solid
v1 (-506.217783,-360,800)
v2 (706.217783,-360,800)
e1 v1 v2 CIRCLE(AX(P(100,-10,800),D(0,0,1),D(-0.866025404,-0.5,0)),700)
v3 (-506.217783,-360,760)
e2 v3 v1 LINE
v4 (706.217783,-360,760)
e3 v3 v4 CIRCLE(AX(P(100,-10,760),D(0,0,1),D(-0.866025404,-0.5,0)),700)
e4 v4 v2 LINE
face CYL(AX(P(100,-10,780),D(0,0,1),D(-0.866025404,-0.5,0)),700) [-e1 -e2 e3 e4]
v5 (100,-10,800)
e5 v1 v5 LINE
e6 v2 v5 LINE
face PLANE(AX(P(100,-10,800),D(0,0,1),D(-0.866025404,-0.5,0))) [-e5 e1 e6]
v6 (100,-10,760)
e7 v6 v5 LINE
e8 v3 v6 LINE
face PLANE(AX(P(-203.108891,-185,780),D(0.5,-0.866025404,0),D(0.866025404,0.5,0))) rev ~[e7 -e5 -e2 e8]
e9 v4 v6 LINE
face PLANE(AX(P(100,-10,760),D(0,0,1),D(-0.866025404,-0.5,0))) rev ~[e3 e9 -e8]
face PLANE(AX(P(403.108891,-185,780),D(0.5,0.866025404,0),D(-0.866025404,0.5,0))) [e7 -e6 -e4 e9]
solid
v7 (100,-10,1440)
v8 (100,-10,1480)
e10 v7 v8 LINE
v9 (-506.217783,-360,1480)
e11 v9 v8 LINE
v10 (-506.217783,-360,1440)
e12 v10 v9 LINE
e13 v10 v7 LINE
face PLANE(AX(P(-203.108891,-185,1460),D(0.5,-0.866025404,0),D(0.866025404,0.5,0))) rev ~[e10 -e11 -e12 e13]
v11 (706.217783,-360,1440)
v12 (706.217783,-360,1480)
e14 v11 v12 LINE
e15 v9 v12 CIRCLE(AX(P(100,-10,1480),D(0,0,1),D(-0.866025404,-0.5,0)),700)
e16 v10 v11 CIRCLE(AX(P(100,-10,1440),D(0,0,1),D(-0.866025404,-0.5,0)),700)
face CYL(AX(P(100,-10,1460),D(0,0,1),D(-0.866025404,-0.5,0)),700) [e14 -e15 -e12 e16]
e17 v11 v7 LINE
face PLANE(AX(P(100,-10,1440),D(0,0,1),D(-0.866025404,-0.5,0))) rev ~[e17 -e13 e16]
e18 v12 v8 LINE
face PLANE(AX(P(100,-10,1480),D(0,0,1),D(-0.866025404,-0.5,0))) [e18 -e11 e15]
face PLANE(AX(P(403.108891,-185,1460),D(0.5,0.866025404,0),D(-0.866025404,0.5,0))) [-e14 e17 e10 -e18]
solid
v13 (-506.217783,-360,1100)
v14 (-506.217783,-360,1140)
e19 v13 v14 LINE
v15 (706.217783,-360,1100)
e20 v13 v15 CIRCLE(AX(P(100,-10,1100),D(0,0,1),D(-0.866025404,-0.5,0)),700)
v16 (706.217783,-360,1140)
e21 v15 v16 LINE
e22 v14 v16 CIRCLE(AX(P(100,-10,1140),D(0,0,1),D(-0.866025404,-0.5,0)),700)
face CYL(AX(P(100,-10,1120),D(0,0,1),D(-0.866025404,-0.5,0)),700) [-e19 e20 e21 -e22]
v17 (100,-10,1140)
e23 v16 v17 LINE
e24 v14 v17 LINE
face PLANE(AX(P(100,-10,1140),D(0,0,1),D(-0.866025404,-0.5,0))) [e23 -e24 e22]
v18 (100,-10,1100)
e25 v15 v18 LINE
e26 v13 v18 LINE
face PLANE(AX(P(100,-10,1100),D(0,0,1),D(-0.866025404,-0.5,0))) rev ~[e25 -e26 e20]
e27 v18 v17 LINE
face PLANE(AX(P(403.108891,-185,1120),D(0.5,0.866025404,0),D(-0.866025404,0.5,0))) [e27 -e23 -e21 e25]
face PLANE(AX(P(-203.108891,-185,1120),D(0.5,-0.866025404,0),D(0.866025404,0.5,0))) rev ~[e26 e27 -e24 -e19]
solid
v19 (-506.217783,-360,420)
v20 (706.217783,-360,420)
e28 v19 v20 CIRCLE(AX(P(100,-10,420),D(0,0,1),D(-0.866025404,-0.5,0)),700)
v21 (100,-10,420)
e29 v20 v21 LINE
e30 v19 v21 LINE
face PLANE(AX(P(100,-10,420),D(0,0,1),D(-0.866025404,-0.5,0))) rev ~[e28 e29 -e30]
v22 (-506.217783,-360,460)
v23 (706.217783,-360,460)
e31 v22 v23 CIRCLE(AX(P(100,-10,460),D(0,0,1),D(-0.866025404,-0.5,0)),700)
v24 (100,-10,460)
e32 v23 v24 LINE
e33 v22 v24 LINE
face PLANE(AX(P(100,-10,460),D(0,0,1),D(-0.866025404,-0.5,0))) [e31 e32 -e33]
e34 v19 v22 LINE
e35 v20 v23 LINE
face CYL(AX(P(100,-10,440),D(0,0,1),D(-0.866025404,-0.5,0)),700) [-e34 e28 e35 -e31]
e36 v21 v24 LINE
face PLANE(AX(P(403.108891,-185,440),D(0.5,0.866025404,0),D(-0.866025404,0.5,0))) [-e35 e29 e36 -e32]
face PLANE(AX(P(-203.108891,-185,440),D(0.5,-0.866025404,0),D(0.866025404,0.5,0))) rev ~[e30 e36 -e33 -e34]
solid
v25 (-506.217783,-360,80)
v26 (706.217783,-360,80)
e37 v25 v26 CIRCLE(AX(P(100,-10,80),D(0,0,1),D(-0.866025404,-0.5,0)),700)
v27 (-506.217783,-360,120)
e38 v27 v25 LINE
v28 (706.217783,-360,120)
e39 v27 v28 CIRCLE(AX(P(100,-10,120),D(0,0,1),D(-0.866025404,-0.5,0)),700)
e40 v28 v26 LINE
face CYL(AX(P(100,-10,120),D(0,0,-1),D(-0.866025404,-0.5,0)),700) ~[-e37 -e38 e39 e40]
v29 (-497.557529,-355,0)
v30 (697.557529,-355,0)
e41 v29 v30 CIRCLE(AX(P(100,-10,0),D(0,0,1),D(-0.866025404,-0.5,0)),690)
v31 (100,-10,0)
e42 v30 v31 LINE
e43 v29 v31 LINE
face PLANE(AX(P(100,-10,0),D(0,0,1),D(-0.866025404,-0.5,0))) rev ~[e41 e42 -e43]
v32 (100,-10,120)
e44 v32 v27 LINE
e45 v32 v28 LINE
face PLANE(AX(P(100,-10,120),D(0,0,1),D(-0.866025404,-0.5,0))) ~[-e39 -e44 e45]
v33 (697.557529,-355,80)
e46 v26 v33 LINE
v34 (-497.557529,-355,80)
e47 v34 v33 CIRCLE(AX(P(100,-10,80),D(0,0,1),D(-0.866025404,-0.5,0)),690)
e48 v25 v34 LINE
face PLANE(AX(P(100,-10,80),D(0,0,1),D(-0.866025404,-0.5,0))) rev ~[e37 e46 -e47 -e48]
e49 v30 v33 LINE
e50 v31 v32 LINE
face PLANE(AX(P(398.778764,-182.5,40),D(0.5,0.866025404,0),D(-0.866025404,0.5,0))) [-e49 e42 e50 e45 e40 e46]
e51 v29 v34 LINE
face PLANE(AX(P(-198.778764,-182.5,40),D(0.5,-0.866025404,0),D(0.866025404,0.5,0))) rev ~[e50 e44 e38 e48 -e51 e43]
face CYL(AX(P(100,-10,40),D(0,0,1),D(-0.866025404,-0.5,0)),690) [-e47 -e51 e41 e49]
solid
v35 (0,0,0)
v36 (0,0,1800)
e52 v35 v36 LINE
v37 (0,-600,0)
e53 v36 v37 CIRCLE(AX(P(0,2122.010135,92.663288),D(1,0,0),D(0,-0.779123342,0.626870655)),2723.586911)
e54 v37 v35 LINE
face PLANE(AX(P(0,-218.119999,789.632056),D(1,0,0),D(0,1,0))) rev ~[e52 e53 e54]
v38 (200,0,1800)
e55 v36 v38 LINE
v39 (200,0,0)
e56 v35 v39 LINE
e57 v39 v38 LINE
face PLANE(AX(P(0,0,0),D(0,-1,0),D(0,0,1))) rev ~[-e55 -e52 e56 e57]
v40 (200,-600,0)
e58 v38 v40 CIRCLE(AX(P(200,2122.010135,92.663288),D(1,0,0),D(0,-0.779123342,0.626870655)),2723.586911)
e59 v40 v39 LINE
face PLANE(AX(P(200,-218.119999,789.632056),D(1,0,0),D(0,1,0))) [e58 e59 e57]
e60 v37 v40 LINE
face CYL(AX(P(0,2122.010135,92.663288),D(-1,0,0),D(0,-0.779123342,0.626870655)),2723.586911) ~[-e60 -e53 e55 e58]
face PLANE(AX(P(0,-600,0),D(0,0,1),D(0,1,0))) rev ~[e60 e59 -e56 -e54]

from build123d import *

# Parameters (mm, degrees)
F4_DEPTH      = 200
F6_W          = 690
F6_H          = 80
F7_ANGLE_BACK = 60
F7_ANGLE      = 120
F6_W_2        = 700
F6_H_2        = 40


# Not quite as in the source:
# - a feature of the source that left no trace in its solid (it failed there, or was rolled back) is left out


with BuildPart() as f4:
    # F3 (on Right) → F4 (new body)
    with BuildSketch(Plane.YZ):
        with BuildLine():
            Line((-600, 0), (0, 0))
            Line((0, 0), (0, 1800))
            ThreePointArc((0, 1800), (-461.8112779608, 953.9370926536), (-600, 0))
        make_face()
    extrude(amount=F4_DEPTH)


with BuildPart() as f7:
    # F6 (on offset) → F7 (revolve)
    with BuildSketch(Plane.YZ.offset(100), mode=Mode.PRIVATE) as f7_sk:
        with Locations((-355, 40)):
            Rectangle(F6_W, F6_H)
        Polygon((-700, 80), (-10, 80), (-10, 120), (-710, 120), (-710, 80), align=None)
    revolve(f7_sk.sketch.rotate(Axis((100, -10, 40), (0, 0, 1)), -F7_ANGLE_BACK), axis=Axis((100, -10, 40), (0, 0, 1)), revolution_arc=F7_ANGLE)


with BuildPart() as f7b:
    # F6 (on offset) → F7, piece 2 (revolve)
    with BuildSketch(Plane.YZ.offset(100), mode=Mode.PRIVATE) as f7_sk:
        with Locations((-360, 440)):
            Rectangle(F6_W_2, F6_H_2)
    revolve(f7_sk.sketch.rotate(Axis((100, -10, 40), (0, 0, 1)), -F7_ANGLE_BACK), axis=Axis((100, -10, 40), (0, 0, 1)), revolution_arc=F7_ANGLE)


with BuildPart() as f7c:
    # F6 (on offset) → F7, piece 3 (revolve)
    with BuildSketch(Plane.YZ.offset(100), mode=Mode.PRIVATE) as f7_sk:
        with Locations((-360, 780)):
            Rectangle(F6_W_2, F6_H_2)
    revolve(f7_sk.sketch.rotate(Axis((100, -10, 40), (0, 0, 1)), -F7_ANGLE_BACK), axis=Axis((100, -10, 40), (0, 0, 1)), revolution_arc=F7_ANGLE)


with BuildPart() as f7d:
    # F6 (on offset) → F7, piece 4 (revolve)
    with BuildSketch(Plane.YZ.offset(100), mode=Mode.PRIVATE) as f7_sk:
        with Locations((-360, 1120)):
            Rectangle(F6_W_2, F6_H_2)
    revolve(f7_sk.sketch.rotate(Axis((100, -10, 40), (0, 0, 1)), -F7_ANGLE_BACK), axis=Axis((100, -10, 40), (0, 0, 1)), revolution_arc=F7_ANGLE)


with BuildPart() as f7e:
    # F6 (on offset) → F7, piece 5 (revolve)
    with BuildSketch(Plane.YZ.offset(100), mode=Mode.PRIVATE) as f7_sk:
        with Locations((-360, 1460)):
            Rectangle(F6_W_2, F6_H_2)
    revolve(f7_sk.sketch.rotate(Axis((100, -10, 40), (0, 0, 1)), -F7_ANGLE_BACK), axis=Axis((100, -10, 40), (0, 0, 1)), revolution_arc=F7_ANGLE)


solid = Compound([f4.part, f7.part, f7b.part, f7c.part, f7d.part, f7e.part])
